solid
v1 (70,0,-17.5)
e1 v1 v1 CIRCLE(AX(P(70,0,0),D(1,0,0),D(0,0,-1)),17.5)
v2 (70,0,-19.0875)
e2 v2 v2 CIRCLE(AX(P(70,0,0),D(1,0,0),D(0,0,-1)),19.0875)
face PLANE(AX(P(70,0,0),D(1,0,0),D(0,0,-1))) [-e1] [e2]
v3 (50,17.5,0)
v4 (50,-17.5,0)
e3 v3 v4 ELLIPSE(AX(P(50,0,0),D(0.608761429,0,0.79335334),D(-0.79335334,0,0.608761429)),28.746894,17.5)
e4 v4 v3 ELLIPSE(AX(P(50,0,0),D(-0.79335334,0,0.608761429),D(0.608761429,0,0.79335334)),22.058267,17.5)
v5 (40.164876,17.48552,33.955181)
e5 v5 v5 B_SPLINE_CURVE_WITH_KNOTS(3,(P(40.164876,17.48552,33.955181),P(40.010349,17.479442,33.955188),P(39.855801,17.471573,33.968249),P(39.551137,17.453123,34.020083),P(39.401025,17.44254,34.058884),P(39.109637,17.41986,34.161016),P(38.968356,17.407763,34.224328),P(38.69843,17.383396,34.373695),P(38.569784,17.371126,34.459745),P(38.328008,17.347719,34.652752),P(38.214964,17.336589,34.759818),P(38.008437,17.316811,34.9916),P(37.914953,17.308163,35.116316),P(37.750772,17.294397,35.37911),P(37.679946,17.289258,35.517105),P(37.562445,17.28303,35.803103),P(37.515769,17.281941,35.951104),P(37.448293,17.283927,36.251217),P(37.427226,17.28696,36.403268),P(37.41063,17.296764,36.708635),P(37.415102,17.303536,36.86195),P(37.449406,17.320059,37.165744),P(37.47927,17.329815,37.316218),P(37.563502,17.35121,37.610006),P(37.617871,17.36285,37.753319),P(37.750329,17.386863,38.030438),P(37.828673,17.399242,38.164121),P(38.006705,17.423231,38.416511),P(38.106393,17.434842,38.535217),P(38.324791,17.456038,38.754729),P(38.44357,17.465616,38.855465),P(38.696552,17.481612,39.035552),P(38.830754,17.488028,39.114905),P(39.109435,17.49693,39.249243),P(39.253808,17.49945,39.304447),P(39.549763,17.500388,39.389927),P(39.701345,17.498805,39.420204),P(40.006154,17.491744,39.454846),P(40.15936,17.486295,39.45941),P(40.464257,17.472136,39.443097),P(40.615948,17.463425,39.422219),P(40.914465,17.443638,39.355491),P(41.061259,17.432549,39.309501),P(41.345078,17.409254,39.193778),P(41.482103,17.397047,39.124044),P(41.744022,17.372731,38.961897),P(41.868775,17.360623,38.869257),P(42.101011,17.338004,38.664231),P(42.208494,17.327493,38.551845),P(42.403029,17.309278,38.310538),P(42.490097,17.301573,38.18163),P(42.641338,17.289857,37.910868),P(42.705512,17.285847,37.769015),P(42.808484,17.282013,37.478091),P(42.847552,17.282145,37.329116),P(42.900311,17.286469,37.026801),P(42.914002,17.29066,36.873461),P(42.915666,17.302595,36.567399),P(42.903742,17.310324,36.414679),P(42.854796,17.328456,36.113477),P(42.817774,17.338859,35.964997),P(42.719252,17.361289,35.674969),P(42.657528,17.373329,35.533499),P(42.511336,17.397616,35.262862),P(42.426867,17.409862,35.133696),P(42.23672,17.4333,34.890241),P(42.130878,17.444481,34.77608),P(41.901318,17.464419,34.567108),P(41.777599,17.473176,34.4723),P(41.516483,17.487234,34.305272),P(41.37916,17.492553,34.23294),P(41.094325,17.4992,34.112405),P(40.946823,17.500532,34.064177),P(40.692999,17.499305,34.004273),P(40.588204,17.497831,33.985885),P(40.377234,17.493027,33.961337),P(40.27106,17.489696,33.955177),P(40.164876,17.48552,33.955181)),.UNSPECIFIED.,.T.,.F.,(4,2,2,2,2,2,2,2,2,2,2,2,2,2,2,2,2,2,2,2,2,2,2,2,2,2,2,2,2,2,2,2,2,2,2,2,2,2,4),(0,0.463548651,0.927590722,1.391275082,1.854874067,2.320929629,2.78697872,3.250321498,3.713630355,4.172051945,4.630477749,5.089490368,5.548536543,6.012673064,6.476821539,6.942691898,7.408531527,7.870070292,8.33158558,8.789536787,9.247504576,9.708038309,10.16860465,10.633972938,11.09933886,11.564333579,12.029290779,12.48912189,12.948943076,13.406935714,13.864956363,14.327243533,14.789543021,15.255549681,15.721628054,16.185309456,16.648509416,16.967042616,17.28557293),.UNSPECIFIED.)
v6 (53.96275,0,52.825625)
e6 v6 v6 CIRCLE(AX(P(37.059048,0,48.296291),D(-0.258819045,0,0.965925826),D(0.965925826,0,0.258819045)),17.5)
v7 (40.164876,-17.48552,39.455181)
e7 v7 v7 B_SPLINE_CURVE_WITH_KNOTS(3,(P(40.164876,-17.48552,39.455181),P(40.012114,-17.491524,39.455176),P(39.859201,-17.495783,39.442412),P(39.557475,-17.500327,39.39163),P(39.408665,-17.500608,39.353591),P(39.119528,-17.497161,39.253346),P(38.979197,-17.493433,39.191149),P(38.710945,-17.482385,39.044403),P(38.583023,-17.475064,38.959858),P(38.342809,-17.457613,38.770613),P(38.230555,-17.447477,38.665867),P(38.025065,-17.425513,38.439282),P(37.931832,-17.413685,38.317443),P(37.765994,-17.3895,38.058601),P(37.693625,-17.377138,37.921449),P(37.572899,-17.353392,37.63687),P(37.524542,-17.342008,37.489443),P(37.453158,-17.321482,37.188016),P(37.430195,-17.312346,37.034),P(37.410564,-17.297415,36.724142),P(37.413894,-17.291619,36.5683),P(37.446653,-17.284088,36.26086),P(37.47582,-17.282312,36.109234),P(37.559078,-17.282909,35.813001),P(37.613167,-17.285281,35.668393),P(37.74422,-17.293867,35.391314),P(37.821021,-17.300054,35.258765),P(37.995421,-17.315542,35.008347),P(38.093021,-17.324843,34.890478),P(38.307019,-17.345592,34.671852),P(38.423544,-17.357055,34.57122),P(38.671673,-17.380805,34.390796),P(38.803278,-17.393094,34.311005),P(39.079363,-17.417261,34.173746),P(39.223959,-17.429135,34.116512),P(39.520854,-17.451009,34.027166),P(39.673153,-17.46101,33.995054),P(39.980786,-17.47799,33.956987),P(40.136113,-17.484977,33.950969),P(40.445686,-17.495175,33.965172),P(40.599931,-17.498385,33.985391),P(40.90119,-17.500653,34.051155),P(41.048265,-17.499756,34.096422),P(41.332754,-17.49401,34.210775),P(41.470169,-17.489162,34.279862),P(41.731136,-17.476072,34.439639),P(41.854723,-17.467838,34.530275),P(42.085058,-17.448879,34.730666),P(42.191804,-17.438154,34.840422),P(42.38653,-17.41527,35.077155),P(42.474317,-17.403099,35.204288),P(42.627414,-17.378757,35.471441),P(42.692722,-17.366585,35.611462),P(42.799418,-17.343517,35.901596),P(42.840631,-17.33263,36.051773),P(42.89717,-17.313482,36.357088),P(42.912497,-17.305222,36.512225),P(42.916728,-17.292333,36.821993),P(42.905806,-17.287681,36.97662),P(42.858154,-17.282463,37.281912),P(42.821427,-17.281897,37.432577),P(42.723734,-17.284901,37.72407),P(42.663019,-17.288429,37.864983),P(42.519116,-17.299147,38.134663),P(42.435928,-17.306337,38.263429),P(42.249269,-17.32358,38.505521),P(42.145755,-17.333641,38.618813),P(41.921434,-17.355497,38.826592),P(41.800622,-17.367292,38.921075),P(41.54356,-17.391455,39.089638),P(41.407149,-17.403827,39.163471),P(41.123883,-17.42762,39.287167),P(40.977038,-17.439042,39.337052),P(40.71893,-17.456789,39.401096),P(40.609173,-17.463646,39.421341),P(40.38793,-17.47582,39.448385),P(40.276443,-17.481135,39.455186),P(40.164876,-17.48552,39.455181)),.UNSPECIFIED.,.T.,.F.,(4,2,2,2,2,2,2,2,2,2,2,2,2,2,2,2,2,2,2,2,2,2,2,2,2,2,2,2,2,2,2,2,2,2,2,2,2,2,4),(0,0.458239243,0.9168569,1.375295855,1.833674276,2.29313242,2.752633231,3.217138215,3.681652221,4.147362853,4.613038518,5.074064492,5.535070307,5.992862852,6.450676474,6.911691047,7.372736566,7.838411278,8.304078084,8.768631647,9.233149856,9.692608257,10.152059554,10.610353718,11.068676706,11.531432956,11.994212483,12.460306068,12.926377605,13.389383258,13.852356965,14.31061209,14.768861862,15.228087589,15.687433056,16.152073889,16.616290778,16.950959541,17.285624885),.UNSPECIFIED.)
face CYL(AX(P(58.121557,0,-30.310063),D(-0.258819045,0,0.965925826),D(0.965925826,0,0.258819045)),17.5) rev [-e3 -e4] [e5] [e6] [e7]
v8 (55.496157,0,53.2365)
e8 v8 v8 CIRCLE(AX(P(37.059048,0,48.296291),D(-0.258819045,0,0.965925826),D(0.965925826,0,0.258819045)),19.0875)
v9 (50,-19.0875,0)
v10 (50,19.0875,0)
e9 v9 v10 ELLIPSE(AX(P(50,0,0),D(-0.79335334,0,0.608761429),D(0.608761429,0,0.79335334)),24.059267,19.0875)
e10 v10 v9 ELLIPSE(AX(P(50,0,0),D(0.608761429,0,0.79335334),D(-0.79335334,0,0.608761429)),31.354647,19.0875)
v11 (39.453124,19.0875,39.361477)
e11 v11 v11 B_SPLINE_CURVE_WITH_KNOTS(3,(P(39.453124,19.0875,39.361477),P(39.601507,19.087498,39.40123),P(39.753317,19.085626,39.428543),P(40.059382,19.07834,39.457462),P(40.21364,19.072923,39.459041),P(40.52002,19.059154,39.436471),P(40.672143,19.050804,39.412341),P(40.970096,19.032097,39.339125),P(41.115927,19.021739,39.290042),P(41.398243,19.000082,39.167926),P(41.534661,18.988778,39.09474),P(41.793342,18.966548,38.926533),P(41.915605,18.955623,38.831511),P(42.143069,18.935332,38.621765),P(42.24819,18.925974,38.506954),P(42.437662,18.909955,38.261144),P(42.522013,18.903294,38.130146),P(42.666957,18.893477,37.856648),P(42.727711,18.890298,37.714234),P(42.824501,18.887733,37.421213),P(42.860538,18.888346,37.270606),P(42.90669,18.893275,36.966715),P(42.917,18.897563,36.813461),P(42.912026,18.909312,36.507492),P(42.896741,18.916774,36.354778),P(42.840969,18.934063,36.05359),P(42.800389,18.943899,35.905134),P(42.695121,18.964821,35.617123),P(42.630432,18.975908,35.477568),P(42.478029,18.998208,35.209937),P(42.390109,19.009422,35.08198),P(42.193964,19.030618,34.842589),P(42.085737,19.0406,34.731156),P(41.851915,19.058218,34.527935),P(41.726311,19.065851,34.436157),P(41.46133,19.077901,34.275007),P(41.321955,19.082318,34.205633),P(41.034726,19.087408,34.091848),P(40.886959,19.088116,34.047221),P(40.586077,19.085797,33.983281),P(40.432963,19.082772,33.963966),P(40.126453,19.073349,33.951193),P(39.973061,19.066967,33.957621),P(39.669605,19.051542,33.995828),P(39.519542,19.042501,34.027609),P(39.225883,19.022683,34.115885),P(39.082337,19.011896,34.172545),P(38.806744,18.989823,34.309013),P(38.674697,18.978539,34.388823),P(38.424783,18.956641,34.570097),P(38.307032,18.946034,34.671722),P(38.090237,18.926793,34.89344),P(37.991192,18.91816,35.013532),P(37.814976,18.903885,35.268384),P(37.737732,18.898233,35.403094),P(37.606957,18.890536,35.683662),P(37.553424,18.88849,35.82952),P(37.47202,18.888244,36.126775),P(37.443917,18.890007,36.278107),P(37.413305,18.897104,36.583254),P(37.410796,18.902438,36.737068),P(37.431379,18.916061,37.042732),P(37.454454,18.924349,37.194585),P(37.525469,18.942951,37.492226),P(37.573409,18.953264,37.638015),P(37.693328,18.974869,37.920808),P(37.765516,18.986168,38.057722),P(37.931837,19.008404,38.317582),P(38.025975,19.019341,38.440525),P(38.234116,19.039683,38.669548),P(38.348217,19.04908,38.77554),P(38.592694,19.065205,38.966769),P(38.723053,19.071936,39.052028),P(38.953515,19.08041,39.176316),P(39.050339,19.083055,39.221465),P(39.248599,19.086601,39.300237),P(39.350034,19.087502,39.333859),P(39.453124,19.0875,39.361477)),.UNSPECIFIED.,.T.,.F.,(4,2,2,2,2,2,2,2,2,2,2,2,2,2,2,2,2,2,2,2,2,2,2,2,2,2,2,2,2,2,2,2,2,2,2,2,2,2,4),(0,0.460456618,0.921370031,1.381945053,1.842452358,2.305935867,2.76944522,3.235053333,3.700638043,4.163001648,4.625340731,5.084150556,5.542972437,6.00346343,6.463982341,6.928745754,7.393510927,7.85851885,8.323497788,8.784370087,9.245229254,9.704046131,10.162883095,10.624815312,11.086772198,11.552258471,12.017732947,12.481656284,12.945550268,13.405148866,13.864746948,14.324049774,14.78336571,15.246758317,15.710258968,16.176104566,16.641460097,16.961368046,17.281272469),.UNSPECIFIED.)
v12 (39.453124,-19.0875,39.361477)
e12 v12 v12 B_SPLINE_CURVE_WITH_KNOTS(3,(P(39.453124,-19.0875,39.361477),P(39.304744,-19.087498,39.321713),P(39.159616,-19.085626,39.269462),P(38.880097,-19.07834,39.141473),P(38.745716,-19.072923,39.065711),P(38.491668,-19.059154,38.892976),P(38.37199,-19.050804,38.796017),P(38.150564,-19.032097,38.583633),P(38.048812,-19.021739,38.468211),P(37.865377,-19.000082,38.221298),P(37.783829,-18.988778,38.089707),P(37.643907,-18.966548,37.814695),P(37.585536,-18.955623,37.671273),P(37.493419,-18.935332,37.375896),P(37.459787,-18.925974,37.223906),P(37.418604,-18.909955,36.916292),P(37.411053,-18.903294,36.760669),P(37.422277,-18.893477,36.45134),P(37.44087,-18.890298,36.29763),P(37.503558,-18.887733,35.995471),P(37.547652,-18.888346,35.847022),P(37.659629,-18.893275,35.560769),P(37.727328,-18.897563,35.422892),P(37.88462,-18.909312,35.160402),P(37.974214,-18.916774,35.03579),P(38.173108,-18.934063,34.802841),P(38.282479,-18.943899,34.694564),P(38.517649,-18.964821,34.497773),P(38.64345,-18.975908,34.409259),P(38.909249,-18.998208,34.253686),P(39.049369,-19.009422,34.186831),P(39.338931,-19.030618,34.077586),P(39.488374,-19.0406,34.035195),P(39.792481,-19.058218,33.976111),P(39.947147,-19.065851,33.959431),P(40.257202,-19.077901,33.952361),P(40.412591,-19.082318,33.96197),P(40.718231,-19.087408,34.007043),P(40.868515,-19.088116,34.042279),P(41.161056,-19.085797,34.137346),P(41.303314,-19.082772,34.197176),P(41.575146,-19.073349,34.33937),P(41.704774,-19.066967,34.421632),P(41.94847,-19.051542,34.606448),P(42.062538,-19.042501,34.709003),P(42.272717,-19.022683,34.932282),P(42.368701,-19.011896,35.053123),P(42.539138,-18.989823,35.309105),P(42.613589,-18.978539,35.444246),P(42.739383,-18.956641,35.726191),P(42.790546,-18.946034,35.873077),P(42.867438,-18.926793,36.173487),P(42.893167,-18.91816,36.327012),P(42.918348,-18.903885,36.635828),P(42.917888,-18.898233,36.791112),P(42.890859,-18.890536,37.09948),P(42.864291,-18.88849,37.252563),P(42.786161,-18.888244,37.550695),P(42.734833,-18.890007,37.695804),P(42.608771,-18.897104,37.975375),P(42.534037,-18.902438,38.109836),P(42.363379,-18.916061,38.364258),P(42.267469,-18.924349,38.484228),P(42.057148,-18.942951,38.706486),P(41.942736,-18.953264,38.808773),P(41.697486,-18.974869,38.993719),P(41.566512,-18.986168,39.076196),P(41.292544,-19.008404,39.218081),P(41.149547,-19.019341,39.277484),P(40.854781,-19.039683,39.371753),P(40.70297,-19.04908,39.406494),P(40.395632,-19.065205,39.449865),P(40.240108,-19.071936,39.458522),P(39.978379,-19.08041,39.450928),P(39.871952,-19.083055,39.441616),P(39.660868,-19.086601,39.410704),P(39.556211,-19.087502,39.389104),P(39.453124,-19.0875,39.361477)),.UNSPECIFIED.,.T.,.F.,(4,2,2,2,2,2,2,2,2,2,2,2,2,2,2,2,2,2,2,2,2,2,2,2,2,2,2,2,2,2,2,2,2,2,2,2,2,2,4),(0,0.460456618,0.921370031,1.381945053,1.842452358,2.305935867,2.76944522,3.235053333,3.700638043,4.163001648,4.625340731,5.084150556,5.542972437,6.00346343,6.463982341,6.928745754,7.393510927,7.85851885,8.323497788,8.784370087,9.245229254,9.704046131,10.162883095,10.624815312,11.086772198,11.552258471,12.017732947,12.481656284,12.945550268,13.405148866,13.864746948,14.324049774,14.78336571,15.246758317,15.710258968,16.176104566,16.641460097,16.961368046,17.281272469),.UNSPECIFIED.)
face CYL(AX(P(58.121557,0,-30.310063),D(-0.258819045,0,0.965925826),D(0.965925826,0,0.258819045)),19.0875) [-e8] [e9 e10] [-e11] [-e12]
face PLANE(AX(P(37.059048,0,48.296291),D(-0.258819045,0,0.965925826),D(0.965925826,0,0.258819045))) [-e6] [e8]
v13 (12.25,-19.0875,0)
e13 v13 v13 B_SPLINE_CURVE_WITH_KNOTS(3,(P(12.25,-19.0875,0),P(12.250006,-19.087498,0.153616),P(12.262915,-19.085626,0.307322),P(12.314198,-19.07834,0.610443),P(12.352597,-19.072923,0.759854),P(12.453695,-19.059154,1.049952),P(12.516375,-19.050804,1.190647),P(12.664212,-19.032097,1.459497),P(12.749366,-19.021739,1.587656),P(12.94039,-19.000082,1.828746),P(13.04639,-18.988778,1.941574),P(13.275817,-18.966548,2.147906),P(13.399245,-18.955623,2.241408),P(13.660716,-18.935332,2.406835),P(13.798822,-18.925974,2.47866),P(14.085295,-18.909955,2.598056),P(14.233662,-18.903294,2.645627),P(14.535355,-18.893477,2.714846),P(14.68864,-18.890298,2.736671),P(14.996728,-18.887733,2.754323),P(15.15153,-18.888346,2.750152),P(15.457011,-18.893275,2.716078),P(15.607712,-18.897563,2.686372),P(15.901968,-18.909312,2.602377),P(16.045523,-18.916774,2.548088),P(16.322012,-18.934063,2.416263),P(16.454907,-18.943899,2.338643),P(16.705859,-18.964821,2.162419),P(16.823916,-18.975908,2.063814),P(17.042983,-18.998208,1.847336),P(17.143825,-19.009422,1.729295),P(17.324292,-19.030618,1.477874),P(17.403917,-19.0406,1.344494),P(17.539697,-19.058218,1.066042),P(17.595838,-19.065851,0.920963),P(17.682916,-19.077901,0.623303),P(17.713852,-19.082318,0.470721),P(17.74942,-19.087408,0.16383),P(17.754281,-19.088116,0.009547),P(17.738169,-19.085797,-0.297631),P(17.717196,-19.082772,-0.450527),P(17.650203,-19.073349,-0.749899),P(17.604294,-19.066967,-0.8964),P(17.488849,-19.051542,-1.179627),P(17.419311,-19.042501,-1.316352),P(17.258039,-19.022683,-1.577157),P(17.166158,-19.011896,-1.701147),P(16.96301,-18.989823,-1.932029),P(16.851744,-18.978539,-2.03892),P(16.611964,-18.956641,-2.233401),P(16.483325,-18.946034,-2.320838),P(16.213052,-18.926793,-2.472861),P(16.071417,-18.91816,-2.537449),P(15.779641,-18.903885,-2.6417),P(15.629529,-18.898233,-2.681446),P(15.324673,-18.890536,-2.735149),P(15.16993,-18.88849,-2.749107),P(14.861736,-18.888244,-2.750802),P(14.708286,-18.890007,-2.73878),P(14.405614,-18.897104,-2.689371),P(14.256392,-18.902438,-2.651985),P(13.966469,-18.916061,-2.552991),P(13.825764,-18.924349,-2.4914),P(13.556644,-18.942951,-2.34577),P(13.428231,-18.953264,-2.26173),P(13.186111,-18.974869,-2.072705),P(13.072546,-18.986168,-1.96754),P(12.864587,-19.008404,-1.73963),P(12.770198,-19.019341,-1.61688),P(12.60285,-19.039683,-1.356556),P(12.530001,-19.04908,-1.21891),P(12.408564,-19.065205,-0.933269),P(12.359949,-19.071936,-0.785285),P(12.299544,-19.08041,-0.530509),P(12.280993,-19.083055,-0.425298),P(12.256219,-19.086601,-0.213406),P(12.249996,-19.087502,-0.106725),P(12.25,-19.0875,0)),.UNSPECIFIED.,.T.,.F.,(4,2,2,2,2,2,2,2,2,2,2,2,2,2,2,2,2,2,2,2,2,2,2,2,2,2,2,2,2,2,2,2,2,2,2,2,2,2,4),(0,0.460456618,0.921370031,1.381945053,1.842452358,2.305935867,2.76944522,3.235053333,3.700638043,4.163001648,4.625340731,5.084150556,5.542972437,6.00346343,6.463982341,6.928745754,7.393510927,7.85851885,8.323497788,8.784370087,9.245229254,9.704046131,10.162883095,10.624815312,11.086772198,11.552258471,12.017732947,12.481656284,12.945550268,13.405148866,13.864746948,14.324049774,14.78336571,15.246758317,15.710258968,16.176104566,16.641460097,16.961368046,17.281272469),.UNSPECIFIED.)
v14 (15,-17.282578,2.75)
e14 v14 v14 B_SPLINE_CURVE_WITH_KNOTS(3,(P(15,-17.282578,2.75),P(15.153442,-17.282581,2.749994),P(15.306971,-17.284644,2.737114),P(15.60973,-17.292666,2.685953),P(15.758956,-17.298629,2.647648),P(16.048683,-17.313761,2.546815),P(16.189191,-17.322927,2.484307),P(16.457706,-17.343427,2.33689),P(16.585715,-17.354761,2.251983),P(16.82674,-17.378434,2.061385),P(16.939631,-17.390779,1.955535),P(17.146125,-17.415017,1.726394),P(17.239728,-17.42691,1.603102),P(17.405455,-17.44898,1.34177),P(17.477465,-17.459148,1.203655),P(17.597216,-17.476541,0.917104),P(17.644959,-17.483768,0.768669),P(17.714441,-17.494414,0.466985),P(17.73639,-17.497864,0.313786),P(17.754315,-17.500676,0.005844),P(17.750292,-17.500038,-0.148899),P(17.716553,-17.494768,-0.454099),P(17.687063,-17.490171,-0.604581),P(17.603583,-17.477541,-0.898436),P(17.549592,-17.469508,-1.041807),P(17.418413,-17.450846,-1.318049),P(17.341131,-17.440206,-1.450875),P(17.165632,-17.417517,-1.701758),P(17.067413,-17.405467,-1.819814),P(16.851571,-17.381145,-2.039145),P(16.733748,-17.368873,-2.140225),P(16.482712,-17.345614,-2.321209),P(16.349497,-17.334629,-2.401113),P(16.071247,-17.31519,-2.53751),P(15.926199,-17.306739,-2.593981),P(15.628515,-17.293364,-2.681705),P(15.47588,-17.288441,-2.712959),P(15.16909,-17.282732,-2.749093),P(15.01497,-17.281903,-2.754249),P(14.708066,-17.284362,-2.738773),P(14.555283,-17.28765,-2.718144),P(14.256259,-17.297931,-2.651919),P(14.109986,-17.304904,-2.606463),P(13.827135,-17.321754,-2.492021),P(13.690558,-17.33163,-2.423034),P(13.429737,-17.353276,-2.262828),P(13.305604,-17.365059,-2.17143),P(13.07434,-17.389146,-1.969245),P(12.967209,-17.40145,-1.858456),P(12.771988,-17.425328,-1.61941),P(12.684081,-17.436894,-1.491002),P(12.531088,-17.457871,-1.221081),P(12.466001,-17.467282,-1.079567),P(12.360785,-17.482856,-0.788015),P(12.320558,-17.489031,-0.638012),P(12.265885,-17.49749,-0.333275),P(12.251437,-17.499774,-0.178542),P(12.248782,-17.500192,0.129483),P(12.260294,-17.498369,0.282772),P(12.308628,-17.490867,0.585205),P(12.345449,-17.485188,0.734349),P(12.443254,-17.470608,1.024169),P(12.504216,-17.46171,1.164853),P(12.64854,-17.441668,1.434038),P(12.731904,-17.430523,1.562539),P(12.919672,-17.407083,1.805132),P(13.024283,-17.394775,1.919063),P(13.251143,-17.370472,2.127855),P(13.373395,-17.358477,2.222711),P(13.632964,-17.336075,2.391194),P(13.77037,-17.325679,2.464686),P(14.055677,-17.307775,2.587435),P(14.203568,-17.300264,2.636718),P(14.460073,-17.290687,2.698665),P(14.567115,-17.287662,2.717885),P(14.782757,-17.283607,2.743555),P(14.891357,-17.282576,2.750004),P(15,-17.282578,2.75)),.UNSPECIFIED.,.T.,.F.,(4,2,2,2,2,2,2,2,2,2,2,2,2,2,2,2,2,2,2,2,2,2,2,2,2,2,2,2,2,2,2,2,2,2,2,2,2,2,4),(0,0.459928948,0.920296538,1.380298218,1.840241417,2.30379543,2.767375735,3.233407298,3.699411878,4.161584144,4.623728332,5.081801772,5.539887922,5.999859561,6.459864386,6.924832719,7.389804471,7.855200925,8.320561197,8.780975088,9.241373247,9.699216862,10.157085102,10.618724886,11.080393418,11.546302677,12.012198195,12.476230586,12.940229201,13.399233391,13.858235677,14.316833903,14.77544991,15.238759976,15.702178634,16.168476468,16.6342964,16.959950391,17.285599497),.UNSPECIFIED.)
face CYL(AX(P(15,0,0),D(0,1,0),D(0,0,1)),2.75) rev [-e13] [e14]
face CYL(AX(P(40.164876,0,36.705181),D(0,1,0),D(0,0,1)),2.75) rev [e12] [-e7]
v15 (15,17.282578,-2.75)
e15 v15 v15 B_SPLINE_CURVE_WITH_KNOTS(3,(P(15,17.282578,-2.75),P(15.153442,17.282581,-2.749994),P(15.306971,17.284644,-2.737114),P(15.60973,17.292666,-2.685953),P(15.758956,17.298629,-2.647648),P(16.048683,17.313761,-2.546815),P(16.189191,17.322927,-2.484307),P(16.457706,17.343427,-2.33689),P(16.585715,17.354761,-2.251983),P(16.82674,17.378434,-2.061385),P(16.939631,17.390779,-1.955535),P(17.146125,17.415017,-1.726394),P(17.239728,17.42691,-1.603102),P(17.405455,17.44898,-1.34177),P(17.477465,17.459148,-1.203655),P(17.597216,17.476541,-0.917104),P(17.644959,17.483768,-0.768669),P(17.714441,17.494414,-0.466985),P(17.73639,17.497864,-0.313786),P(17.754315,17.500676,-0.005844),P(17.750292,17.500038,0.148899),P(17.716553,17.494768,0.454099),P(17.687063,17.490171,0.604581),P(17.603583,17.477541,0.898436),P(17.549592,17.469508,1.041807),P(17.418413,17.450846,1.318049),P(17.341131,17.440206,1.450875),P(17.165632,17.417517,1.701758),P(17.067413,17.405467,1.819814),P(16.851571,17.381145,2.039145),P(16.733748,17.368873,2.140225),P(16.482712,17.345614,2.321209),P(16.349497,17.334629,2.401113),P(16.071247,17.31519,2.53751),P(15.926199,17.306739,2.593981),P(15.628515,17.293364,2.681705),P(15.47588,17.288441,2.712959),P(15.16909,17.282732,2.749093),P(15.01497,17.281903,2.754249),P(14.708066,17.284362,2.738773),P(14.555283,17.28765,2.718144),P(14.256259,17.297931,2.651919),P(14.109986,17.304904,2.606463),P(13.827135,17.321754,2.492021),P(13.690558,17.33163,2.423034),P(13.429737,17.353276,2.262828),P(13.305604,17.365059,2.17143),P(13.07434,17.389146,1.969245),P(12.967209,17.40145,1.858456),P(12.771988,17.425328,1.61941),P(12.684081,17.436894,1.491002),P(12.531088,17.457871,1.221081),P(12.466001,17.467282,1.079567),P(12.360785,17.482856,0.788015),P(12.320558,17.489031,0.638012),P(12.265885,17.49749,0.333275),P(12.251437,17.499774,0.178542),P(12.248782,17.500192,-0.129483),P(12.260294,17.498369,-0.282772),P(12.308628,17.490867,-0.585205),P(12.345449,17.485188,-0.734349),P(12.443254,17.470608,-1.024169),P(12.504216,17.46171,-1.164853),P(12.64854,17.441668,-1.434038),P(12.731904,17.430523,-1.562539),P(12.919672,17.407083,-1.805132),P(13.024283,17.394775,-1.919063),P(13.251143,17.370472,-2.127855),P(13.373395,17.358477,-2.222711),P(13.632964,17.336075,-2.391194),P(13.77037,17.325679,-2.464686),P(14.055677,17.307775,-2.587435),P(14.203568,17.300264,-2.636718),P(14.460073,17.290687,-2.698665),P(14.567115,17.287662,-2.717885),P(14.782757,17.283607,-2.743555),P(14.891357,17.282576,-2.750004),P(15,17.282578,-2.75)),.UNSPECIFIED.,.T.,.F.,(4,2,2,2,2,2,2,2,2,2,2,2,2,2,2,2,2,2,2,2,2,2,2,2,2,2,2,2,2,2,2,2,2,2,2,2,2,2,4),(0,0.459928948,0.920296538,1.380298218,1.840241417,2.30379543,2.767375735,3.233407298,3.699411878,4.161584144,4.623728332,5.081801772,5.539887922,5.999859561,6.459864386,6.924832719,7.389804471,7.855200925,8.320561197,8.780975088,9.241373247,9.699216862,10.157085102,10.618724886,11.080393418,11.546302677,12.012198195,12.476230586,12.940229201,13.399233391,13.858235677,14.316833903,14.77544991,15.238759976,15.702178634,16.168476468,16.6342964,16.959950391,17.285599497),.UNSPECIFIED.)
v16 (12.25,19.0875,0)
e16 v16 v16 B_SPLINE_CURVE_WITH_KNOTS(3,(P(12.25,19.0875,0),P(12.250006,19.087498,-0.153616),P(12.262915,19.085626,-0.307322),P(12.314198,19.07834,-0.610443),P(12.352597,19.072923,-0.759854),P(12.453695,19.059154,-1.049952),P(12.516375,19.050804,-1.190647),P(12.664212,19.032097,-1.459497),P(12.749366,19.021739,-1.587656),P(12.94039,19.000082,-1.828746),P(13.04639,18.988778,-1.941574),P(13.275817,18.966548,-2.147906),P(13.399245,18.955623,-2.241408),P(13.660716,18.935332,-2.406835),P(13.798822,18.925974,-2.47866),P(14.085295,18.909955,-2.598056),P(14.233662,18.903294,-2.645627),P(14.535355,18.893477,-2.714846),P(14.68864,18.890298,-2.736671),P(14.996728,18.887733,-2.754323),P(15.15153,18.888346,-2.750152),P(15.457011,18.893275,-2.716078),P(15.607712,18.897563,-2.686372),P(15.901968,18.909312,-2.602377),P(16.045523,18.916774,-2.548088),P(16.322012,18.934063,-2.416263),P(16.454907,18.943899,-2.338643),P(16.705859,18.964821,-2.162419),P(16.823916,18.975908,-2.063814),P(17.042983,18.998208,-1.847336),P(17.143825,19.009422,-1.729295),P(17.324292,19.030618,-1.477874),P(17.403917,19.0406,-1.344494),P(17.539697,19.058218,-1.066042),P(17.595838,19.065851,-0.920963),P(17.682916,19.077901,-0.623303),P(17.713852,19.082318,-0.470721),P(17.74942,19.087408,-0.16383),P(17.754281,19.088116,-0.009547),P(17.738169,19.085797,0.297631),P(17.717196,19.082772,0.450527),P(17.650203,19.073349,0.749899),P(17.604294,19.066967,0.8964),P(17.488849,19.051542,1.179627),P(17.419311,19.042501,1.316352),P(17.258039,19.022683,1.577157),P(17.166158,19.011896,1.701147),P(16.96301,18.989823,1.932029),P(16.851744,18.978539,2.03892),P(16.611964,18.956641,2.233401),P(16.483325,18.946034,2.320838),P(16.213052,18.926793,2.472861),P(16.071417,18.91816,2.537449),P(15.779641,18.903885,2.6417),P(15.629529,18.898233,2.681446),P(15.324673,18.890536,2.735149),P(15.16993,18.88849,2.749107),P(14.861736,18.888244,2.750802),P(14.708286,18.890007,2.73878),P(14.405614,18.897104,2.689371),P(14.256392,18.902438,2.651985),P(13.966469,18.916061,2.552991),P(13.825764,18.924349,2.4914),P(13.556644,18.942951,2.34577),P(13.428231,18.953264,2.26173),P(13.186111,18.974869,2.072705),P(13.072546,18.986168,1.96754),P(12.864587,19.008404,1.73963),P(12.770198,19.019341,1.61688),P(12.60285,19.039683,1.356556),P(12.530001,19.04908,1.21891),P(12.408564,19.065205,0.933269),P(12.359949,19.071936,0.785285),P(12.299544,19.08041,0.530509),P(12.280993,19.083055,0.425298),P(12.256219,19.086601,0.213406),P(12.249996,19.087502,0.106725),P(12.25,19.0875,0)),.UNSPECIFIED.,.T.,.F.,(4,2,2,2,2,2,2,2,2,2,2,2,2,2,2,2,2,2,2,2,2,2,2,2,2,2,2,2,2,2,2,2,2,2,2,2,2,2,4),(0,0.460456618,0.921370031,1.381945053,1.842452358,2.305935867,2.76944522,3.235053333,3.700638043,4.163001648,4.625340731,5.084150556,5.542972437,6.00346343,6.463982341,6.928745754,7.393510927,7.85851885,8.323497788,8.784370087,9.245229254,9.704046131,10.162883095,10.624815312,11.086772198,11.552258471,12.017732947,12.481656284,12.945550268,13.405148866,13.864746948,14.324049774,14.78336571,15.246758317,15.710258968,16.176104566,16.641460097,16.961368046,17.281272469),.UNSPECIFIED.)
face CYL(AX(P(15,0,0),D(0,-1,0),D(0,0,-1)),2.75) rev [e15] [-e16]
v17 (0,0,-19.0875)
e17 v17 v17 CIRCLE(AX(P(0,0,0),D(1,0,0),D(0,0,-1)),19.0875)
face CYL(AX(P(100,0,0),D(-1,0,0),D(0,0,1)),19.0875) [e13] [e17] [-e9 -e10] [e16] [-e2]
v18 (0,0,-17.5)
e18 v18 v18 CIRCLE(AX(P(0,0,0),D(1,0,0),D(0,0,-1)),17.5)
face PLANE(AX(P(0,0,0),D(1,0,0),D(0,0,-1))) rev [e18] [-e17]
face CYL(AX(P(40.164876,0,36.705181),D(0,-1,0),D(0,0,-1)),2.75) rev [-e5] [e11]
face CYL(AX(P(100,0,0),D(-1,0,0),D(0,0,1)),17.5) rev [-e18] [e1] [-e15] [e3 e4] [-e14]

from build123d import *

# Parameters (mm, degrees)
SKETCH2_R                     = 19.0875
BOSS_EXTRUDE1_DEPTH           = 100
BOSS_EXTRUDE2_REACH           = 96.162
BOSS_EXTRUDE2_END_RADIUS      = 19.0875
SKETCH3_R                     = 19.0875
SHELL1_OUTLINE_R              = 17.5
SHELL1_DEPTH                  = 100
SHELL1_START                  = -37.059047745
SHELL1_2_OUTLINE_R            = 17.5
SHELL1_2_DEPTH                = 50.0000001
SKETCH6_W                     = 2.75
SKETCH6_H                     = 19.0875
M5_CLEARANCE_HOLE1_AT_2_COUNT = 2
M5_CLEARANCE_HOLE1_AT_2_PITCH = 44.503273363
MIRROR1_COPY_1_SKETCH_W       = 2.75
MIRROR1_COPY_1_SKETCH_H       = 19.0875
CUT_EXTRUDE1_START            = -30
SKETCH7_R                     = 19.0875
SKETCH7_R_2                   = 17.5
CUT_EXTRUDE1_DEPTH            = 30


with BuildPart() as part:
    # Sketch2 → Boss-Extrude1 (new body)
    with BuildSketch(Plane(origin=(0, 0, 0), x_dir=(0, 0, -1), z_dir=(1, 0, 0))):
        Circle(SKETCH2_R)
    extrude(amount=BOSS_EXTRUDE1_DEPTH)

    # Boss-Extrude2: up to this cylinder (the profile starts outside it)
    boss_extrude2_end = Plane(origin=(37.059048, 0, 0), z_dir=(-1, 0, 0)) * Cylinder(BOSS_EXTRUDE2_END_RADIUS, 231.499, mode=Mode.PRIVATE)
    # Sketch3 → Boss-Extrude2 (add, up to the surface)
    with BuildSketch(Plane(origin=(37.059047745, 0, 48.296291314), x_dir=(0.9659258262890673, 0, 0.2588190451025246), z_dir=(-0.2588190451025246, 0, 0.9659258262890673)), mode=Mode.PRIVATE) as boss_extrude2_sk1:
        Circle(SKETCH3_R)
    boss_extrude2_tool1 = extrude(boss_extrude2_sk1.sketch, amount=-BOSS_EXTRUDE2_REACH, mode=Mode.PRIVATE) - boss_extrude2_end
    add(boss_extrude2_tool1.solids().sort_by_distance((37.059048, 0, 48.296291))[0])

    # Shell1: read off the stored shape, not the designer's step
    # Shell1 outline → Shell1 (cut)
    with BuildSketch(Plane.YZ):
        Circle(SHELL1_OUTLINE_R)
    extrude(amount=SHELL1_DEPTH, mode=Mode.SUBTRACT)

    # Shell1 2 outline → Shell1 2 (cut)
    with BuildSketch(Plane(origin=(0, 0, 0), x_dir=(0.9659258262890672, 0, 0.2588190451025251), z_dir=(0.25881904510252507, 0, -0.9659258262890672)).offset(SHELL1_START)):
        with Locations((48.296291314, 0)):
            Circle(SHELL1_2_OUTLINE_R)
    extrude(amount=SHELL1_2_DEPTH, mode=Mode.SUBTRACT)

    # Sketch6 → M5 Clearance Hole1 (revolve, cut)
    with BuildSketch(Plane(origin=(15, 0, 0), x_dir=(0, 0, -1), z_dir=(1, 0, 0))):
        with Locations((1.375, 9.54375)):
            Rectangle(SKETCH6_W, SKETCH6_H)
    m5_clearance_hole1 = revolve(axis=Axis((15, -6.35, 0), (0, 1, 0)), mode=Mode.SUBTRACT)

    # M5 Clearance Hole1 at 2: M5 Clearance Hole1 ×2
    with Locations(*[Vector(0.5654612432844534, 0, 0.8247748676719001) * (i * M5_CLEARANCE_HOLE1_AT_2_PITCH) for i in range(1, M5_CLEARANCE_HOLE1_AT_2_COUNT)]):
        add(m5_clearance_hole1, mode=Mode.SUBTRACT)

    # Mirror1: M5 Clearance Hole1 across plane
    add(m5_clearance_hole1.mirror(Plane.ZX), mode=Mode.SUBTRACT)

    # Mirror1 copy 1 sketch → Mirror1 copy 1 (revolve, cut)
    with BuildSketch(Plane(origin=(40.164876286, 0, 36.705181399), x_dir=(0, 0, -1), z_dir=(1, 0, 0))):
        with Locations((1.375, -9.54375)):
            Rectangle(MIRROR1_COPY_1_SKETCH_W, MIRROR1_COPY_1_SKETCH_H)
    revolve(axis=Axis((40.164876286, 6.35, 36.705181399), (0, 1, 0)), mode=Mode.SUBTRACT)

    # Sketch7 → Cut-Extrude1 (cut)
    with BuildSketch(Plane(origin=(100, 0, 0), x_dir=(0, 0, -1), z_dir=(1, 0, 0)).offset(CUT_EXTRUDE1_START)):
        Circle(SKETCH7_R)
        Circle(SKETCH7_R_2, mode=Mode.SUBTRACT)
    extrude(amount=CUT_EXTRUDE1_DEPTH, mode=Mode.SUBTRACT)


solid = part.part
